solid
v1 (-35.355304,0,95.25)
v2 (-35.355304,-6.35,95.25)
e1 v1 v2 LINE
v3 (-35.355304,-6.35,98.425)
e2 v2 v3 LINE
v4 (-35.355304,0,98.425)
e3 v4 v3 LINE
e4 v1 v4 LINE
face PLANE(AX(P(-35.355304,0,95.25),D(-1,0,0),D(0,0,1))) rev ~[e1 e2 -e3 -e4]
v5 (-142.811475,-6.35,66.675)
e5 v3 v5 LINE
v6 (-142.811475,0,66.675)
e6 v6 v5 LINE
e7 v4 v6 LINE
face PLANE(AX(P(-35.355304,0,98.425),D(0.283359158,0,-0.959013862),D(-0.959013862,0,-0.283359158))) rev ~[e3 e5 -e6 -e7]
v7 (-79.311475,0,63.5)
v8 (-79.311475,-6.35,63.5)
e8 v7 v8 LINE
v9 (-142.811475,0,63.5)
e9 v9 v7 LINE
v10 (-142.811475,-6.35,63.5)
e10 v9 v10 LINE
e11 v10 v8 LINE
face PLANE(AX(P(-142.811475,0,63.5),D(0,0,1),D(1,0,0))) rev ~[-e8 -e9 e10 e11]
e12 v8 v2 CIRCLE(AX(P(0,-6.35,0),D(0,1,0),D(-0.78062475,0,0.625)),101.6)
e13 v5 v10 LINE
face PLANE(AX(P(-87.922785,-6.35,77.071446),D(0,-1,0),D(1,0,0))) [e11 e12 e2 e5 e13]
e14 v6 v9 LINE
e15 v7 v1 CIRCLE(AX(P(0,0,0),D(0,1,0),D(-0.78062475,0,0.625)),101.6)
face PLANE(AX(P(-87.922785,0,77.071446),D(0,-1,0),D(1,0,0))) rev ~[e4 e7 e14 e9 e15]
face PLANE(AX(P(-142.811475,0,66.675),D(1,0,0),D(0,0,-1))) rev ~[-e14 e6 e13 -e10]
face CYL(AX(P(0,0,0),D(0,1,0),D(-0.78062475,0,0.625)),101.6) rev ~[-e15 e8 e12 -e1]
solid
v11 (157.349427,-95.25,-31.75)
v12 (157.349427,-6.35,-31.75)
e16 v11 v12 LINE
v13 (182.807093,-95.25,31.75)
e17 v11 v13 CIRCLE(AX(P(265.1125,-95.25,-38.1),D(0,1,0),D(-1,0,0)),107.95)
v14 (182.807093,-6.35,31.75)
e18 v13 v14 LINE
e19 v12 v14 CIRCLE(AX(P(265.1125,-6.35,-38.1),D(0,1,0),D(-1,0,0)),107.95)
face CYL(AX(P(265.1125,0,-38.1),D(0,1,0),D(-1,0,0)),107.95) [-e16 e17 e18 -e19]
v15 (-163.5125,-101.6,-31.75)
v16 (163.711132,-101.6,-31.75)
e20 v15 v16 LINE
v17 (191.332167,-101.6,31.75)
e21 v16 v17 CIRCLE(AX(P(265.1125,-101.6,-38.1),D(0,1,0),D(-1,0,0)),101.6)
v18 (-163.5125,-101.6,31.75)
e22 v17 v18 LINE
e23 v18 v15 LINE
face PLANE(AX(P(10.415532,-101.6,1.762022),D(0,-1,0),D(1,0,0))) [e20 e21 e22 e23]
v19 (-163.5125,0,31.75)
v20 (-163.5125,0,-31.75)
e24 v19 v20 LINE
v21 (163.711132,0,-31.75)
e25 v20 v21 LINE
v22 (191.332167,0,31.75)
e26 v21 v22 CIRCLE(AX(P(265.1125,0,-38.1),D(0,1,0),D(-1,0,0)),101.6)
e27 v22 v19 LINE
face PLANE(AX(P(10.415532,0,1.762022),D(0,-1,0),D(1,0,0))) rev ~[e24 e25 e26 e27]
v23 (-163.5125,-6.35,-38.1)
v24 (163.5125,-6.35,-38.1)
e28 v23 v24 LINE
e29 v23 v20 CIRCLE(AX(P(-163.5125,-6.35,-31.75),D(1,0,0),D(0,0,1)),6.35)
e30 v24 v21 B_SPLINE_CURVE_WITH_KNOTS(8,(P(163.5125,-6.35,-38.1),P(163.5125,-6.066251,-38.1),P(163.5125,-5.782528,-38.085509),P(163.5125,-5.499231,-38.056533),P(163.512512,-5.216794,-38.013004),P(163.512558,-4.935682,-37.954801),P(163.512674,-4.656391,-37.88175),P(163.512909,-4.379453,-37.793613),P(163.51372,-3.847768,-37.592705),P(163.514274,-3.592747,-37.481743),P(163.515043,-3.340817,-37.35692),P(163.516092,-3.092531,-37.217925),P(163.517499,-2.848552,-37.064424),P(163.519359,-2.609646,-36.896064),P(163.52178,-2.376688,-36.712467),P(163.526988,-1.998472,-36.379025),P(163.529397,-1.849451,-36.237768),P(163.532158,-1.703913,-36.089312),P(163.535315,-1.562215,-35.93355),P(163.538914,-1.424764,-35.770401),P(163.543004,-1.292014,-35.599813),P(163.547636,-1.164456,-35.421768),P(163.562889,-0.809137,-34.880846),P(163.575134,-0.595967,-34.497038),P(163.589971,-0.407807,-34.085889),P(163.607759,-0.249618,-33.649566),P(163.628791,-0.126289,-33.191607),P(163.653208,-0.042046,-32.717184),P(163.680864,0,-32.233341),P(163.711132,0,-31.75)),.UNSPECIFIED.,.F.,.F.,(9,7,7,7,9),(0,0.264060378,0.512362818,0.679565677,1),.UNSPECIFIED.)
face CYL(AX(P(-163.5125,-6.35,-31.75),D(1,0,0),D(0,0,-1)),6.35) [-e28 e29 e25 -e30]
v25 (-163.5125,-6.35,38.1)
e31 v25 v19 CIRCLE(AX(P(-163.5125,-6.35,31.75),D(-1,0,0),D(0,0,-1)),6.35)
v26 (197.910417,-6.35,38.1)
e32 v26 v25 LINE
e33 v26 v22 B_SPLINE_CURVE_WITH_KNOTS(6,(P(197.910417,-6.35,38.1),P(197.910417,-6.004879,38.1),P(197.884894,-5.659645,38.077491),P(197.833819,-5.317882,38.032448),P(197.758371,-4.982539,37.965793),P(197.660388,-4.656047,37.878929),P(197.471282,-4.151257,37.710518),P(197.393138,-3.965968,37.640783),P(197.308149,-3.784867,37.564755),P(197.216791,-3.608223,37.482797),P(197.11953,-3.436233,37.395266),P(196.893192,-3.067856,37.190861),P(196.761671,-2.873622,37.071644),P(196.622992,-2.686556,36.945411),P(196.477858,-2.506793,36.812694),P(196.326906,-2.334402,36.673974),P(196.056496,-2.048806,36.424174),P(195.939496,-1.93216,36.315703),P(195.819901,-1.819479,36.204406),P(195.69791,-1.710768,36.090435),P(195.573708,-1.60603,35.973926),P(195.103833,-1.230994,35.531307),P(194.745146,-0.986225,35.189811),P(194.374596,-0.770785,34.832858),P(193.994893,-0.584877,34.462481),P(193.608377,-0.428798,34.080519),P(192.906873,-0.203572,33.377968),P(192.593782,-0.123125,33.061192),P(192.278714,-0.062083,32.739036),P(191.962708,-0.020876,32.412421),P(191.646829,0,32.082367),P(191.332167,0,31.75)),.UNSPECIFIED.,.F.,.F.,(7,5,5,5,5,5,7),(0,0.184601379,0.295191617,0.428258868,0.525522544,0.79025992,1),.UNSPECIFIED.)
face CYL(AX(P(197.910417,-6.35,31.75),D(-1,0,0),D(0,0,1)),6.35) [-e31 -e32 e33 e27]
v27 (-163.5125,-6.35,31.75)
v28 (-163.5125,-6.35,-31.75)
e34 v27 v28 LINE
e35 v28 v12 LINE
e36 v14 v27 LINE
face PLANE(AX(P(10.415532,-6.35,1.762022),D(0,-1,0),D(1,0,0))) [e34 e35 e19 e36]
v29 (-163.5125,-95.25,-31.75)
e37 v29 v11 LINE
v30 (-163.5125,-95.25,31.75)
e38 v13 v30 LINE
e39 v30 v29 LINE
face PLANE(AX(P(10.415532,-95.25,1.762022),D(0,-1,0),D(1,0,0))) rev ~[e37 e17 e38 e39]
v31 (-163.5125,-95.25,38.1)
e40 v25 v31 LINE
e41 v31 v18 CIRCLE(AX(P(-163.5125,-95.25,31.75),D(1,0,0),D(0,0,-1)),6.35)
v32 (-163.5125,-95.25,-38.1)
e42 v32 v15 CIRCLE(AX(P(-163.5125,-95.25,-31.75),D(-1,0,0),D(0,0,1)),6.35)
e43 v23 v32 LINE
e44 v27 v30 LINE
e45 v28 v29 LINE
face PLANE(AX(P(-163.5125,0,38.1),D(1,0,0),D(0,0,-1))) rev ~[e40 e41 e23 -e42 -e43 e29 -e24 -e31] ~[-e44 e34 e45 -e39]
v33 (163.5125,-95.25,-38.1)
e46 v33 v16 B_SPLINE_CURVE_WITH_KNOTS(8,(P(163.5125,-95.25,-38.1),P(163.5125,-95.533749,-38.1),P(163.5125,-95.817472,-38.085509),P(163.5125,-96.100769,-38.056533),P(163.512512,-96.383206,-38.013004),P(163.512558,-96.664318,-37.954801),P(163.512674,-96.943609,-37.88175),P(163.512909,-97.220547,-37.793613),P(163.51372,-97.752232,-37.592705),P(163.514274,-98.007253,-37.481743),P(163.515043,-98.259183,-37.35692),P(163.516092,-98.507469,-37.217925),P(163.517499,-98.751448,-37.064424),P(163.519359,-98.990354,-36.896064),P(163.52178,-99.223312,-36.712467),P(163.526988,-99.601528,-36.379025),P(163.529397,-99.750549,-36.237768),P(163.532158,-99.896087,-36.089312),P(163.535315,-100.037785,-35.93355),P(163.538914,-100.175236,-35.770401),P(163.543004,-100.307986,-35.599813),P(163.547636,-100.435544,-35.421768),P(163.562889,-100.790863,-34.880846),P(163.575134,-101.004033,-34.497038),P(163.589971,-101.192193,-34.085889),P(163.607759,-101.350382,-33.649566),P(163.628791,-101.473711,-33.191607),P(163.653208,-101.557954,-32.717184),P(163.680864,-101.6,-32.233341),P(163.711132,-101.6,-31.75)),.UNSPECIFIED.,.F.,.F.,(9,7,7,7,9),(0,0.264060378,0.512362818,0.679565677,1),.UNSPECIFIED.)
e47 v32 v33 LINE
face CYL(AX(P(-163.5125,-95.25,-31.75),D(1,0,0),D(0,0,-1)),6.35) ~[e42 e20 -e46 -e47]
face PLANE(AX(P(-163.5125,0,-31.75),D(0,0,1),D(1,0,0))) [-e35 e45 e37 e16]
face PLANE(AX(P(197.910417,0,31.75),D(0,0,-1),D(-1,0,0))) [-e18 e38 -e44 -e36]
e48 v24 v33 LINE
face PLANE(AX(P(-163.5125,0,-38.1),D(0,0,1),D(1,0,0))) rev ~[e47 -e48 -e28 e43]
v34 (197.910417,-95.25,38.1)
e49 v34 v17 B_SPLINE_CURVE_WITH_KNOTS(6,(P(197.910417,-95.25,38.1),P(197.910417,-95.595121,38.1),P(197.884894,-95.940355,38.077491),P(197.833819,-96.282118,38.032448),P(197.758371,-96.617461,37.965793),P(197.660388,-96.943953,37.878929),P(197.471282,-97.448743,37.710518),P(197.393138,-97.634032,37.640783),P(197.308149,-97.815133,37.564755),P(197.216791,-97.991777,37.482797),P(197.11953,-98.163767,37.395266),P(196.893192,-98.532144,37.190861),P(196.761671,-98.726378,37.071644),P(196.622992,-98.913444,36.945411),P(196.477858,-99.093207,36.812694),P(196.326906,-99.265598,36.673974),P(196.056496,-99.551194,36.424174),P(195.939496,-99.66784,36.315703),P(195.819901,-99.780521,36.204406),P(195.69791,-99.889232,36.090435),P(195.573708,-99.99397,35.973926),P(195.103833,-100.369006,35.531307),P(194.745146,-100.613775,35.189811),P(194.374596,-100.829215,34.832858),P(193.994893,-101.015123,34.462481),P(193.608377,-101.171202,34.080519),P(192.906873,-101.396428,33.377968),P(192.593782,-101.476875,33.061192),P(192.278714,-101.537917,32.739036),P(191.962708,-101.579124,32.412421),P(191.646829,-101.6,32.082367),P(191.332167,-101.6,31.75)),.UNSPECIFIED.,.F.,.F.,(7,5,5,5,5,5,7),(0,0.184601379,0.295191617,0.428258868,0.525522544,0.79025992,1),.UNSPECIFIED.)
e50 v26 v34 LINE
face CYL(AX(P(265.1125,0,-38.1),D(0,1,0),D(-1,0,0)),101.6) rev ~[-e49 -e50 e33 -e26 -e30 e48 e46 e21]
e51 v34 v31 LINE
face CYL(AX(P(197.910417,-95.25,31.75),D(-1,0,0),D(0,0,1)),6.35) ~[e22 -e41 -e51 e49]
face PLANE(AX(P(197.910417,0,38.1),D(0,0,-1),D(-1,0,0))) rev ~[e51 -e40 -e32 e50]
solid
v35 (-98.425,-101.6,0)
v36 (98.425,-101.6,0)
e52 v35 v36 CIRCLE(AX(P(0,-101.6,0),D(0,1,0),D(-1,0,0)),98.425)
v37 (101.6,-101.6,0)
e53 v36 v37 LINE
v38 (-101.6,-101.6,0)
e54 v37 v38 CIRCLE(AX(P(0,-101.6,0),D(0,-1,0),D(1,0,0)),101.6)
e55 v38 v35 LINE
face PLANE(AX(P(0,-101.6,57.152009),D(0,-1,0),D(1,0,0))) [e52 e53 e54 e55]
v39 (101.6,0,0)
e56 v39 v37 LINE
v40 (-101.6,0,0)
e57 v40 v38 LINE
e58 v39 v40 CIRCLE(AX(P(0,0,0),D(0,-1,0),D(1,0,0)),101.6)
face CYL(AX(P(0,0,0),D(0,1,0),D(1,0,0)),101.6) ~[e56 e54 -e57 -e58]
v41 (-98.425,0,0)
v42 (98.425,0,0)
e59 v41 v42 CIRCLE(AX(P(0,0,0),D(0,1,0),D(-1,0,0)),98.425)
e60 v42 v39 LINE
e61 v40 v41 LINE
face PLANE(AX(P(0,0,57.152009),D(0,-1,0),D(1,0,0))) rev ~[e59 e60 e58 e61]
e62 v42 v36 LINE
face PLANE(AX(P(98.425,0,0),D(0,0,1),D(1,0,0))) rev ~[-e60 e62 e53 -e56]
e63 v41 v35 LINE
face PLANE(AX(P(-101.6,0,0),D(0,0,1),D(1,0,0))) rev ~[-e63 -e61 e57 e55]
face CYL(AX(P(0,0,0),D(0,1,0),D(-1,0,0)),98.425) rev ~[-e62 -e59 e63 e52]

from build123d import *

# Parameters (mm, degrees)
F1_DEPTH = 101.6
F2_R     = 6.35
F3_T     = 6.35
F5_DEPTH = 101.6
F7_DEPTH = 6.35


# Not quite as in the source:
# - a shell that OpenCascade refuses in one call is made with other operations: the cavity is built on its own and cut out


with BuildPart() as f1:
    # F0 (on Front) → F1 (new body)
    with BuildSketch(Plane.XZ):
        with BuildLine():
            Line((197.910416699, 38.1), (163.5125, 38.1))
            Line((163.5125, 38.1), (-163.5125, 38.1))
            Line((-163.5125, 38.1), (-163.5125, -38.1))
            Line((-163.5125, -38.1), (163.5125, -38.1))
            ThreePointArc((163.5125, -38.1), (172.510416699, 3.702083301), (197.910416699, 38.1))
        make_face()
    extrude(amount=F1_DEPTH)

    # F2
    f2_edges = [f1.edges().sort_by_distance(p)[0] for p in [
        (17.198958, -101.6, 38.1),
        (0, -101.6, -38.1),
        (17.198958, 0, 38.1),
        (0, 0, -38.1),
    ]]
    fillet(f2_edges, radius=F2_R)

    # F3: shell of thickness 6.35, made by hand


with BuildPart() as f3_core1:
    # F3_t2: copy of F1
    add(f1.part)

    # the walls: a layer under each face that stays
    f3_faces = [f3_core1.faces().sort_by_distance(p)[0] for p in [
        (172.510416699, -50.8, 3.702083301),
        (0, -50.8, -38.1),
        (13.9098336274, 0, 0),
        (13.9098336274, -101.6, 0),
        (17.1989583495, -50.8, 38.1),
    ]]
    thicken(f3_faces, amount=-F3_T, mode=Mode.SUBTRACT)


with BuildPart() as f1_1:
    add(f1.part)

    # what is left inside the walls is the cavity
    f3_cavity = [f3_core1.part.solids().sort_by_distance(p)[0] for p in [
        (9.647297, -65.616667, 31.6865),
    ]]
    add(f3_cavity, mode=Mode.SUBTRACT)


with BuildPart() as f5:
    # F4 (on Front) → F5 (new body)
    with BuildSketch(Plane.XZ):
        with BuildLine():
            Line((98.425, 0), (101.6, 0))
            ThreePointArc((101.6, 0), (0, 101.6), (-101.6, 0))
            Line((-101.6, 0), (-98.425, 0))
            ThreePointArc((-98.425, 0), (0, 98.425), (98.425, 0))
        make_face()
    extrude(amount=F5_DEPTH)


with BuildPart() as f7:
    # F6 (on Front) → F7 (new body)
    with BuildSketch(Plane.XZ):
        with BuildLine():
            ThreePointArc((-79.3114745797, 63.5), (-59.4906138436, 82.3615618144), (-35.355303704, 95.25))
            Line((-35.355303704, 95.25), (-35.355303704, 98.425))
            Line((-35.355303704, 98.425), (-142.8114745797, 66.675))
            Line((-142.8114745797, 66.675), (-142.8114745797, 63.5))
            Line((-142.8114745797, 63.5), (-79.3114745797, 63.5))
        make_face()
    extrude(amount=F7_DEPTH)


solid = Compound([f1_1.part, f5.part, f7.part])
